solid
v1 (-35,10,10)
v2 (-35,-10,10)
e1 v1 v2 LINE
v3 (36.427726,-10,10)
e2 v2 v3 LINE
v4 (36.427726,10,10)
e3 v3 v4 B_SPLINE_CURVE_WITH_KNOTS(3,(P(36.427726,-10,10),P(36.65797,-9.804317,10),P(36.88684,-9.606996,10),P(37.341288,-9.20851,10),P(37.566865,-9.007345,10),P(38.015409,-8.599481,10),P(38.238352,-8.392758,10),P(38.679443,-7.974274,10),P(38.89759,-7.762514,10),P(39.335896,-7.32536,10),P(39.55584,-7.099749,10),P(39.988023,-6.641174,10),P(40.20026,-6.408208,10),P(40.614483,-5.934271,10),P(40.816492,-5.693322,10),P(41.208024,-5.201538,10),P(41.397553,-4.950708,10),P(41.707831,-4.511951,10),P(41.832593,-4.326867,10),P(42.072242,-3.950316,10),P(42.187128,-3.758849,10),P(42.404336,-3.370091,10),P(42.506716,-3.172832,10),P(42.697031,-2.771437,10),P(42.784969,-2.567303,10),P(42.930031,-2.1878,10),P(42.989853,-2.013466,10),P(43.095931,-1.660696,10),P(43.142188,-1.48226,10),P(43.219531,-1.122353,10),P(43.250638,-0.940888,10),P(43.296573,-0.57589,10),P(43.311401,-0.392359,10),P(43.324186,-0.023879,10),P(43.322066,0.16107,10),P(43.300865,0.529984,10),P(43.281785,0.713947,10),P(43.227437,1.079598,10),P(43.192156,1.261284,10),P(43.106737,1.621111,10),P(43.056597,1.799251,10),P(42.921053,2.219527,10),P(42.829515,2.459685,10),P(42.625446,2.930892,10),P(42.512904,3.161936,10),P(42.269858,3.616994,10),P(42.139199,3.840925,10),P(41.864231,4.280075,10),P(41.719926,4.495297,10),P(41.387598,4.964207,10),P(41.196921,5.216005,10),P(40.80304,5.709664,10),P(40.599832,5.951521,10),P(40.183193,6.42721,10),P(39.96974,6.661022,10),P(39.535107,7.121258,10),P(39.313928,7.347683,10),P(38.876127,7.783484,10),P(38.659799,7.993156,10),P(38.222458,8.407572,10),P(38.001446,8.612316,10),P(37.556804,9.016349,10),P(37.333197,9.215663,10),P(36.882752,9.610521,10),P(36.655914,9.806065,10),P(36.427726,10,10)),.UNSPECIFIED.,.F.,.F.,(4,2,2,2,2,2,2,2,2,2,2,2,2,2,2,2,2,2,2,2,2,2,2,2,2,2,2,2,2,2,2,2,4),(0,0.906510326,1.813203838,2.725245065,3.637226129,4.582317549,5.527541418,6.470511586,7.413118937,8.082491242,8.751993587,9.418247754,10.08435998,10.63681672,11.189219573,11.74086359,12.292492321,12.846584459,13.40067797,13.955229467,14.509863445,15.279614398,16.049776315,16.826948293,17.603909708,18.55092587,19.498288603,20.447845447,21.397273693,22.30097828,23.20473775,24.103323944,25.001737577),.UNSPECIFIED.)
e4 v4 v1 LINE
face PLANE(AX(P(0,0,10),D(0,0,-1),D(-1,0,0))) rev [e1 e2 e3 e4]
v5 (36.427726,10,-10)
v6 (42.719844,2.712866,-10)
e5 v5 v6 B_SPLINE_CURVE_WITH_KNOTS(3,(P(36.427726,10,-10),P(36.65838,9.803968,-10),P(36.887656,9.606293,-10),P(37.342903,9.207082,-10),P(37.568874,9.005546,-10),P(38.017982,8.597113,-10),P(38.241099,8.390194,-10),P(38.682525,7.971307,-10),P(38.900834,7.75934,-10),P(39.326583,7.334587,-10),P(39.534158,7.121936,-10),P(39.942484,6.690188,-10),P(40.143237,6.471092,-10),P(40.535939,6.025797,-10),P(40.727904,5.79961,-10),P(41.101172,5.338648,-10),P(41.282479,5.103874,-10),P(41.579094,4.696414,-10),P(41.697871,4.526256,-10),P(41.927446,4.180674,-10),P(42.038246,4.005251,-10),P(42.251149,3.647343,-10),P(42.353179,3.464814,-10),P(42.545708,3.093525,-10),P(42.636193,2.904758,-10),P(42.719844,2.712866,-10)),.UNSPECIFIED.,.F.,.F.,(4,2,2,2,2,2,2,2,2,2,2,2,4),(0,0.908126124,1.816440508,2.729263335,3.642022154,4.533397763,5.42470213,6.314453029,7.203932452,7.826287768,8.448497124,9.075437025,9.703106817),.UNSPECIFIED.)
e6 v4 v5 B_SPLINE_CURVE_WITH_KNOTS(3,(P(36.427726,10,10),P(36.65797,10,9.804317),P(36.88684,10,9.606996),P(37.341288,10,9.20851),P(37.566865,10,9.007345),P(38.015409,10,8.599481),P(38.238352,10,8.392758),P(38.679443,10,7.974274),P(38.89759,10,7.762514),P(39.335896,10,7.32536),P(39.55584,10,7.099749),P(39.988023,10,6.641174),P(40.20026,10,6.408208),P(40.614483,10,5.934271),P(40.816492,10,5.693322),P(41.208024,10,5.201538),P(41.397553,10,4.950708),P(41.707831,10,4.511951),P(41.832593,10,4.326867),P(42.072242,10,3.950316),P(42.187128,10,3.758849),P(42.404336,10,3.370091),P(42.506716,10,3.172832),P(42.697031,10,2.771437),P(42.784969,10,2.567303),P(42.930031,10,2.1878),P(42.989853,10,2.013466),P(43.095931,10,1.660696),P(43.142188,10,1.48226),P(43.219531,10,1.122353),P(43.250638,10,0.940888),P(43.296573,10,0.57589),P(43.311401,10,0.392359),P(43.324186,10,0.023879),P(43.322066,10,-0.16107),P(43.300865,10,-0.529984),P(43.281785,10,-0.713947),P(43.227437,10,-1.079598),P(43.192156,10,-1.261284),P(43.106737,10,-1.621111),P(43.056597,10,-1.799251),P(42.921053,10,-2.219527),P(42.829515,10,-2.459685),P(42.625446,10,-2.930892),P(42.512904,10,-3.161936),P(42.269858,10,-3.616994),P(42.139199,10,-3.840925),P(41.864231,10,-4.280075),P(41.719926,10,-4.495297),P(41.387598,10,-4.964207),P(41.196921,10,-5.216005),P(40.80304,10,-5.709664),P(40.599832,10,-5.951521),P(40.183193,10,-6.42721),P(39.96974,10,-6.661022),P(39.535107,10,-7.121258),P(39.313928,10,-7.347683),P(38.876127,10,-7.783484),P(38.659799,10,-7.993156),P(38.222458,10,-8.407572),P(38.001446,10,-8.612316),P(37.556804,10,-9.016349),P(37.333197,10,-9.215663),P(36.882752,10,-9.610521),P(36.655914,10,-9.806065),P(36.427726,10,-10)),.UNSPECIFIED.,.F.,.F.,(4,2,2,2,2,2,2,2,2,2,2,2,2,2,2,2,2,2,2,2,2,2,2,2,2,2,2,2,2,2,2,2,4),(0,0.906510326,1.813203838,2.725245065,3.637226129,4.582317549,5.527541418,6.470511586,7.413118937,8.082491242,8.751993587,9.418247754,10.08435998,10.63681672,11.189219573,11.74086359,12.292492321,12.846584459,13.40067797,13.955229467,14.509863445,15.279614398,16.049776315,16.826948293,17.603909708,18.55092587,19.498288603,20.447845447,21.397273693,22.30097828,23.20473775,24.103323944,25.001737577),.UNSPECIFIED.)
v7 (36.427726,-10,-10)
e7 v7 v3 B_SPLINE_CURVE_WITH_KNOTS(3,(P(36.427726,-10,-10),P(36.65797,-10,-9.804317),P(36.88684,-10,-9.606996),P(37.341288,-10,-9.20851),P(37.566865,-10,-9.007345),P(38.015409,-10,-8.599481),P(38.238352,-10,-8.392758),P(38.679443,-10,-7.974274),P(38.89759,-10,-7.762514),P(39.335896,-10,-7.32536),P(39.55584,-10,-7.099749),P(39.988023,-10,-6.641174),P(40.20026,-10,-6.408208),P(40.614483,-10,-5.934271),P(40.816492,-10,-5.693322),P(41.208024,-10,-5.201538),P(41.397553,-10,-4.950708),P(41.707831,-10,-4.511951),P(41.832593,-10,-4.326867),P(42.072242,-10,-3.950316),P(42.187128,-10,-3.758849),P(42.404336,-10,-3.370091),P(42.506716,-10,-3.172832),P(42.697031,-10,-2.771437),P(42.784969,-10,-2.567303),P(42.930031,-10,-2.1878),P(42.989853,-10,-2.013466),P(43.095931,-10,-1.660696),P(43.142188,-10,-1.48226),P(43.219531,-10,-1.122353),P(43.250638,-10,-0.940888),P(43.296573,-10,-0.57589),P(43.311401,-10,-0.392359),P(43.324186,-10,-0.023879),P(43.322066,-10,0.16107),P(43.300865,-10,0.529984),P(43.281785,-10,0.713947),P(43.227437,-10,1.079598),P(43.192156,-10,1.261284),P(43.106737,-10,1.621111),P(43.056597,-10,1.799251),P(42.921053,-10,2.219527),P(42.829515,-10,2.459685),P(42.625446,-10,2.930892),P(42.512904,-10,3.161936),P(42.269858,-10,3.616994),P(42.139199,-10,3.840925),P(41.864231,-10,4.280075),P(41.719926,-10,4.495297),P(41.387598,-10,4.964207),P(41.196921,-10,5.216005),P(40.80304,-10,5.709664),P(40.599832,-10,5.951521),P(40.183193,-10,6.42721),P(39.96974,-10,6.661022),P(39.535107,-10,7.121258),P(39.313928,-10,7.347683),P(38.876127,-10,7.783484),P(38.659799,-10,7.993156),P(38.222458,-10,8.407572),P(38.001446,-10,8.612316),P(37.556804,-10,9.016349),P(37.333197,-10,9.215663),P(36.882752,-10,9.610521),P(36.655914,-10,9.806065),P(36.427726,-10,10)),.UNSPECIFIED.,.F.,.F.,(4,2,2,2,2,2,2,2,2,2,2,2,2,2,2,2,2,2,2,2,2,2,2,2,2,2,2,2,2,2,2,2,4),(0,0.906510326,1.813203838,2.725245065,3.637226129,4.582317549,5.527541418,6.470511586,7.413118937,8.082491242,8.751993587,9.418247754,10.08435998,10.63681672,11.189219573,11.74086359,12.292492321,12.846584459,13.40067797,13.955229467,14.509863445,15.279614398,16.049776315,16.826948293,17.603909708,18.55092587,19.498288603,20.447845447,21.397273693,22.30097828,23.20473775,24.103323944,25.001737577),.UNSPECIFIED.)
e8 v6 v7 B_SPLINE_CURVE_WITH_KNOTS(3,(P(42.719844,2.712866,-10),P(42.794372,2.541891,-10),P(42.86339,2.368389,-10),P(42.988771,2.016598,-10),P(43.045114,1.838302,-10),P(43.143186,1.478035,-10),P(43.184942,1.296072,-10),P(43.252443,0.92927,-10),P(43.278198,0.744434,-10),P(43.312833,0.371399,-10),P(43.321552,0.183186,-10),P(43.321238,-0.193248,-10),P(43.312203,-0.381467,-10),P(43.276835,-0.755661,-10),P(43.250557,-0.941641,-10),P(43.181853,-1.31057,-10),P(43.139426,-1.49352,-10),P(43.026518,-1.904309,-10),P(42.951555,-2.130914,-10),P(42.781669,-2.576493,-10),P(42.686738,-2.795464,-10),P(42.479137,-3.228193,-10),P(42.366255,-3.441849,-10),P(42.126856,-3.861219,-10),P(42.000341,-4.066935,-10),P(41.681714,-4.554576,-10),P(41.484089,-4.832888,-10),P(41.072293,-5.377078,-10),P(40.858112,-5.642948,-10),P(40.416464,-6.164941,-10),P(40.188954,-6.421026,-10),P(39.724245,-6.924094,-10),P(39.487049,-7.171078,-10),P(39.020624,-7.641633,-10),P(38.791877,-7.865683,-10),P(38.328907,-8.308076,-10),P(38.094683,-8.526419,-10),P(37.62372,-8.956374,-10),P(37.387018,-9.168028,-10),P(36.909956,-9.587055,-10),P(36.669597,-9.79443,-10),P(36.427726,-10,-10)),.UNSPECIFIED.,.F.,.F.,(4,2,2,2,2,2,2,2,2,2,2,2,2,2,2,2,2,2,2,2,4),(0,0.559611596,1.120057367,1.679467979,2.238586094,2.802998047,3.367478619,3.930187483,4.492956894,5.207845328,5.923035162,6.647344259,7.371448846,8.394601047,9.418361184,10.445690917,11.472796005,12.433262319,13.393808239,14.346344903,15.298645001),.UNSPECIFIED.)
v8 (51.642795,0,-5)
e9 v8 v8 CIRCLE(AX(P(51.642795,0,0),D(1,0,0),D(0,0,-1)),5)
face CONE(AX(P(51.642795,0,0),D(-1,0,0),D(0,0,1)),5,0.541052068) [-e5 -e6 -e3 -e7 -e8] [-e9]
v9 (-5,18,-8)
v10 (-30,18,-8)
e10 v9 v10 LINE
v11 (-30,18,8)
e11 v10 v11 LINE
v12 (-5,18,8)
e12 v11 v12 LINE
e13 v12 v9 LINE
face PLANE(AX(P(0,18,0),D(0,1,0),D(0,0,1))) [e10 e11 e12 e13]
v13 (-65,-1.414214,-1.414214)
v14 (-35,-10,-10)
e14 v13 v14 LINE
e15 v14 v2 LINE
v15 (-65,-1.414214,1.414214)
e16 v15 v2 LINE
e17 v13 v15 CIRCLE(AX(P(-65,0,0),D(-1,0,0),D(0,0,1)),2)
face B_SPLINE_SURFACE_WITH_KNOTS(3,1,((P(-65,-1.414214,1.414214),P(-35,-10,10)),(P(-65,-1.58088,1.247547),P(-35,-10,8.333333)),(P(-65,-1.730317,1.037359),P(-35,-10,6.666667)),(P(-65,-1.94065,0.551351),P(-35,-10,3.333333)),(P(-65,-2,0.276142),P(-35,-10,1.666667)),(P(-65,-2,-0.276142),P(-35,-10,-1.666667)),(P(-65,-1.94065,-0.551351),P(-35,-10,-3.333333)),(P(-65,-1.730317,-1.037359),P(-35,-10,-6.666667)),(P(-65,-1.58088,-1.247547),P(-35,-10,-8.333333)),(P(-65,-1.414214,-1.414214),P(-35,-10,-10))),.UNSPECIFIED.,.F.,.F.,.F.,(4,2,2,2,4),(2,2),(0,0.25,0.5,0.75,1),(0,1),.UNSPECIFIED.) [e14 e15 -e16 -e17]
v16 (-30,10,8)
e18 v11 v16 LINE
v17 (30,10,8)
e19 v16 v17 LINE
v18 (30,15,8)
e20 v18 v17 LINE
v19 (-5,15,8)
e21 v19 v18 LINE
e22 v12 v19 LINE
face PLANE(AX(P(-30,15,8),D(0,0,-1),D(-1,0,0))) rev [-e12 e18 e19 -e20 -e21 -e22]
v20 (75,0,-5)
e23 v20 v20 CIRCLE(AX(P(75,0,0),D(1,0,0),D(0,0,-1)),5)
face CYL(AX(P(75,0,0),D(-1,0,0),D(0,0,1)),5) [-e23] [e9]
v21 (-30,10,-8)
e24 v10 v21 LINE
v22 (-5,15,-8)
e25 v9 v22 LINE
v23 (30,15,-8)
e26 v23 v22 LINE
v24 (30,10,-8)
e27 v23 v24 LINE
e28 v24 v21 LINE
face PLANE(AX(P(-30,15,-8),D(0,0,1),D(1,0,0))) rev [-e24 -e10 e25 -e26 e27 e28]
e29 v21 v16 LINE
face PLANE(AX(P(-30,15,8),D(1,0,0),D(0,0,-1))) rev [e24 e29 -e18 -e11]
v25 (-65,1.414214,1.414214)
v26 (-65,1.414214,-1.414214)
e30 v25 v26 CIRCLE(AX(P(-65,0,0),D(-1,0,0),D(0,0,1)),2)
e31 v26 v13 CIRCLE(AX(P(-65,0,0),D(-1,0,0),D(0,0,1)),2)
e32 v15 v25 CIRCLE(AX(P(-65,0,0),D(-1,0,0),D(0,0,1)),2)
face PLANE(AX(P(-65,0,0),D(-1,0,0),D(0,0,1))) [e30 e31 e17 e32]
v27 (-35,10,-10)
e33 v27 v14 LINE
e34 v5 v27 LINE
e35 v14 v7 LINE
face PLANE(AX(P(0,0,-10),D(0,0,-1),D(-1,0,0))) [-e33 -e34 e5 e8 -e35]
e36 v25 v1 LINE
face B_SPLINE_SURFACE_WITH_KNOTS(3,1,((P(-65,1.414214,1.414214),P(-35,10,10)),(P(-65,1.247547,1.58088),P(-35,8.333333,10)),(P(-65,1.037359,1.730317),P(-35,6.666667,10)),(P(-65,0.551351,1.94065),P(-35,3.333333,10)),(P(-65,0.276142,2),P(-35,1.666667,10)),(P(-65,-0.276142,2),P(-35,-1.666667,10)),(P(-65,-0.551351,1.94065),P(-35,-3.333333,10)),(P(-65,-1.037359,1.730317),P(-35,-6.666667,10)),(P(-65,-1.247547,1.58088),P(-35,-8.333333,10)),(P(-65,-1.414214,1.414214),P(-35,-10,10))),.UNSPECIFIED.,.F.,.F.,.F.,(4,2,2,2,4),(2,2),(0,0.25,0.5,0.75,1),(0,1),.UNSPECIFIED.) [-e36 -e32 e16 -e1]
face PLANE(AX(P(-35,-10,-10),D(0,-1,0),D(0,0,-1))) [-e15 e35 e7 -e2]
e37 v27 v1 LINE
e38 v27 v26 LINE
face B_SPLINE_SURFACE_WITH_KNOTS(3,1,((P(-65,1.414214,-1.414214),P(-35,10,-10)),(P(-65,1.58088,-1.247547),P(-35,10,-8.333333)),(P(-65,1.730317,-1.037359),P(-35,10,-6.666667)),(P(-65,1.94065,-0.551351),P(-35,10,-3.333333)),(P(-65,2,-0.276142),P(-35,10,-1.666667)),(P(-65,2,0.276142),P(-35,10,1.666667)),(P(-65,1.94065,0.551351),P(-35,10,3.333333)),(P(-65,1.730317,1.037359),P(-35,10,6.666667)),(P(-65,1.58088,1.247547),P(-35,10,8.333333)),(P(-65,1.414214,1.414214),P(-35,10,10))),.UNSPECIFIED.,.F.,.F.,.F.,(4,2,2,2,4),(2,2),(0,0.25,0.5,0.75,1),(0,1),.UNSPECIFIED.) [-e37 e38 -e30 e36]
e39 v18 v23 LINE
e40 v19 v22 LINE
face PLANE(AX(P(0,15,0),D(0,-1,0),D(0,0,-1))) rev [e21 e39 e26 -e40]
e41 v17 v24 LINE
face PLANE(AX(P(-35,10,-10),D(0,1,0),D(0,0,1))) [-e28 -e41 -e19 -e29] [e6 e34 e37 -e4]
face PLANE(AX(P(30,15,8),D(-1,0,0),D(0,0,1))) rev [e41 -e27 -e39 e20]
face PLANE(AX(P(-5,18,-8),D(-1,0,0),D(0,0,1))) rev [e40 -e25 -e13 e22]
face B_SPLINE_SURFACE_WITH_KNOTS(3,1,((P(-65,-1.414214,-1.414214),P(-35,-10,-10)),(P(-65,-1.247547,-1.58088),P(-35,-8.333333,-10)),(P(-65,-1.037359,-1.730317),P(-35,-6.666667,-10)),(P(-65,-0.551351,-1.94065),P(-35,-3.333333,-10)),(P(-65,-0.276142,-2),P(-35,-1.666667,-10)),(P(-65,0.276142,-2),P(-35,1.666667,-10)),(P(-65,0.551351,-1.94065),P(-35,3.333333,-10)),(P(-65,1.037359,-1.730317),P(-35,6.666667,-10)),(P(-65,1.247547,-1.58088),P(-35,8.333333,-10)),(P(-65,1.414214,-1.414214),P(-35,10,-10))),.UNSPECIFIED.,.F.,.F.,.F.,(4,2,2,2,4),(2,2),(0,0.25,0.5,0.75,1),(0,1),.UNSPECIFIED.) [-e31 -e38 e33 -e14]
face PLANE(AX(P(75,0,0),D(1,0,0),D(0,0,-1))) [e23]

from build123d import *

# Parameters (mm, degrees)
DODANIE_WYCI_GNI_CIE1_DEPTH      = 10
DODANIE_WYCI_GNI_CIE1_DEPTH_BACK = 10
SZKIC1_W                         = 70
SZKIC1_H                         = 20
SZKIC4_R                         = 5
DODANIE_WYCI_GNI_CIE2_DEPTH      = 40
SFAZOWANIE1_SIZE                 = 10
SFAZOWANIE1_SIZE_2               = 16.642794824
SZKIC5_W                         = 60
SZKIC5_H                         = 16
DODANIE_WYCI_GNI_CIE3_DEPTH      = 5
SZKIC6_W                         = 25
SZKIC6_H                         = 16
DODANIE_WYCI_GNI_CIE4_DEPTH      = 3


with BuildPart() as part:
    # Szkic1 → Dodanie-wyciągnięcie1 (new, two sides: drawn at the far end of the back side and taken through both)
    with BuildSketch(Plane.XY.offset(-DODANIE_WYCI_GNI_CIE1_DEPTH_BACK)):
        Rectangle(SZKIC1_W, SZKIC1_H)
    extrude(amount=DODANIE_WYCI_GNI_CIE1_DEPTH + DODANIE_WYCI_GNI_CIE1_DEPTH_BACK)

    # Wyciągnięcie po profilach1: read off the stored shape, not the designer's step
    # Wyciągnięcie po profilach1: loft between two sections, ruled curve by curve
    wyci_gni_cie_po_profilach1_from = [
        Edge.make_bspline([(-65, 1.414213562, -1.414213562), (-65, 1.580880229, -1.247546896), (-65, 1.730317192, -1.037358885), (-65, 1.94065032, -0.551350505), (-65, 2, -0.276142375), (-65, 2, 0.276142375), (-65, 1.94065032, 0.551350505), (-65, 1.730317192, 1.037358885), (-65, 1.580880229, 1.247546896), (-65, 1.414213562, 1.414213562)], [0, 0, 0, 0, 0.25, 0.25, 0.5, 0.5, 0.75, 0.75, 1, 1, 1, 1], 3),
        Edge.make_bspline([(-65, 1.414213562, 1.414213562), (-65, 1.247546896, 1.580880229), (-65, 1.037358885, 1.730317192), (-65, 0.551350505, 1.94065032), (-65, 0.276142375, 2), (-65, -0.276142375, 2), (-65, -0.551350505, 1.94065032), (-65, -1.037358885, 1.730317192), (-65, -1.247546896, 1.580880229), (-65, -1.414213562, 1.414213562)], [0, 0, 0, 0, 0.25, 0.25, 0.5, 0.5, 0.75, 0.75, 1, 1, 1, 1], 3),
        Edge.make_bspline([(-65, -1.414213562, -1.414213562), (-65, -1.247546896, -1.580880229), (-65, -1.037358885, -1.730317192), (-65, -0.551350505, -1.94065032), (-65, -0.276142375, -2), (-65, 0.276142375, -2), (-65, 0.551350505, -1.94065032), (-65, 1.037358885, -1.730317192), (-65, 1.247546896, -1.580880229), (-65, 1.414213562, -1.414213562)], [0, 0, 0, 0, 0.25, 0.25, 0.5, 0.5, 0.75, 0.75, 1, 1, 1, 1], 3),
        Edge.make_bspline([(-65, -1.414213562, 1.414213562), (-65, -1.580880229, 1.247546896), (-65, -1.730317192, 1.037358885), (-65, -1.94065032, 0.551350505), (-65, -2, 0.276142375), (-65, -2, -0.276142375), (-65, -1.94065032, -0.551350505), (-65, -1.730317192, -1.037358885), (-65, -1.580880229, -1.247546896), (-65, -1.414213562, -1.414213562)], [0, 0, 0, 0, 0.25, 0.25, 0.5, 0.5, 0.75, 0.75, 1, 1, 1, 1], 3),
    ]
    wyci_gni_cie_po_profilach1_to = [
        Edge.make_bspline([(-35, 10, -10), (-35, 10, -8.333333333), (-35, 10, -6.666666667), (-35, 10, -3.333333333), (-35, 10, -1.666666667), (-35, 10, 1.666666667), (-35, 10, 3.333333333), (-35, 10, 6.666666667), (-35, 10, 8.333333333), (-35, 10, 10)], [0, 0, 0, 0, 0.25, 0.25, 0.5, 0.5, 0.75, 0.75, 1, 1, 1, 1], 3),
        Edge.make_bspline([(-35, 10, 10), (-35, 8.333333333, 10), (-35, 6.666666667, 10), (-35, 3.333333333, 10), (-35, 1.666666667, 10), (-35, -1.666666667, 10), (-35, -3.333333333, 10), (-35, -6.666666667, 10), (-35, -8.333333333, 10), (-35, -10, 10)], [0, 0, 0, 0, 0.25, 0.25, 0.5, 0.5, 0.75, 0.75, 1, 1, 1, 1], 3),
        Edge.make_bspline([(-35, -10, -10), (-35, -8.333333333, -10), (-35, -6.666666667, -10), (-35, -3.333333333, -10), (-35, -1.666666667, -10), (-35, 1.666666667, -10), (-35, 3.333333333, -10), (-35, 6.666666667, -10), (-35, 8.333333333, -10), (-35, 10, -10)], [0, 0, 0, 0, 0.25, 0.25, 0.5, 0.5, 0.75, 0.75, 1, 1, 1, 1], 3),
        Edge.make_bspline([(-35, -10, 10), (-35, -10, 8.333333333), (-35, -10, 6.666666667), (-35, -10, 3.333333333), (-35, -10, 1.666666667), (-35, -10, -1.666666667), (-35, -10, -3.333333333), (-35, -10, -6.666666667), (-35, -10, -8.333333333), (-35, -10, -10)], [0, 0, 0, 0, 0.25, 0.25, 0.5, 0.5, 0.75, 0.75, 1, 1, 1, 1], 3),
    ]
    wyci_gni_cie_po_profilach1 = Solid(Shell([*[Face.make_surface_from_curves(wyci_gni_cie_po_profilach1_from[k], wyci_gni_cie_po_profilach1_to[k]) for k in range(4)], Face(Wire(wyci_gni_cie_po_profilach1_from)), Face(Wire(wyci_gni_cie_po_profilach1_to))]))
    add(wyci_gni_cie_po_profilach1)

    # Szkic4 → Dodanie-wyciągnięcie2 (add)
    with BuildSketch(Plane(origin=(35, 0, 0), x_dir=(0, 0, -1), z_dir=(1, 0, 0))):
        Circle(SZKIC4_R)
    extrude(amount=DODANIE_WYCI_GNI_CIE2_DEPTH)

    # Sfazowanie1
    # the kernel refuses this chamfer: 16.642794824, 10 mm, written as the material it adds along each edge
    with BuildSketch(Plane(origin=(35, 0, 0), x_dir=(0, 0, -1), z_dir=(0, -1, 0))) as sfazowanie1_piece_1_section:
        Polygon((5 + SFAZOWANIE1_SIZE, 0), (5, SFAZOWANIE1_SIZE_2), (5, 0), align=None)
    sfazowanie1_piece_1 = revolve(axis=Axis((35, 0, 0), (1, 0, 0)), mode=Mode.PRIVATE)
    sfazowanie1_piece_1 = split(sfazowanie1_piece_1, bisect_by=Plane(origin=(35, 10, 0), z_dir=(0, -1, 0)), keep=Keep.TOP, mode=Mode.PRIVATE)
    sfazowanie1_piece_1 = split(sfazowanie1_piece_1, bisect_by=Plane(origin=(35, 0, 10), z_dir=(0, 0, -1)), keep=Keep.TOP, mode=Mode.PRIVATE)
    sfazowanie1_piece_1 = split(sfazowanie1_piece_1, bisect_by=Plane(origin=(35, 0, -10), z_dir=(0, 0, 1)), keep=Keep.TOP, mode=Mode.PRIVATE)
    sfazowanie1_piece_1 = split(sfazowanie1_piece_1, bisect_by=Plane(origin=(35, -10, 0), z_dir=(0, 1, 0)), keep=Keep.TOP, mode=Mode.PRIVATE)
    add(sfazowanie1_piece_1)

    # Szkic5 → Dodanie-wyciągnięcie3 (add)
    with BuildSketch(Plane(origin=(0, 10, 0), x_dir=(1, 0, 0), z_dir=(0, 1, 0))):
        Rectangle(SZKIC5_W, SZKIC5_H)
    extrude(amount=DODANIE_WYCI_GNI_CIE3_DEPTH)

    # Szkic6 → Dodanie-wyciągnięcie4 (add)
    with BuildSketch(Plane(origin=(0, 15, 0), x_dir=(1, 0, 0), z_dir=(0, 1, 0))):
        with Locations((-17.5, 0)):
            Rectangle(SZKIC6_W, SZKIC6_H)
    extrude(amount=DODANIE_WYCI_GNI_CIE4_DEPTH)


solid = part.part
